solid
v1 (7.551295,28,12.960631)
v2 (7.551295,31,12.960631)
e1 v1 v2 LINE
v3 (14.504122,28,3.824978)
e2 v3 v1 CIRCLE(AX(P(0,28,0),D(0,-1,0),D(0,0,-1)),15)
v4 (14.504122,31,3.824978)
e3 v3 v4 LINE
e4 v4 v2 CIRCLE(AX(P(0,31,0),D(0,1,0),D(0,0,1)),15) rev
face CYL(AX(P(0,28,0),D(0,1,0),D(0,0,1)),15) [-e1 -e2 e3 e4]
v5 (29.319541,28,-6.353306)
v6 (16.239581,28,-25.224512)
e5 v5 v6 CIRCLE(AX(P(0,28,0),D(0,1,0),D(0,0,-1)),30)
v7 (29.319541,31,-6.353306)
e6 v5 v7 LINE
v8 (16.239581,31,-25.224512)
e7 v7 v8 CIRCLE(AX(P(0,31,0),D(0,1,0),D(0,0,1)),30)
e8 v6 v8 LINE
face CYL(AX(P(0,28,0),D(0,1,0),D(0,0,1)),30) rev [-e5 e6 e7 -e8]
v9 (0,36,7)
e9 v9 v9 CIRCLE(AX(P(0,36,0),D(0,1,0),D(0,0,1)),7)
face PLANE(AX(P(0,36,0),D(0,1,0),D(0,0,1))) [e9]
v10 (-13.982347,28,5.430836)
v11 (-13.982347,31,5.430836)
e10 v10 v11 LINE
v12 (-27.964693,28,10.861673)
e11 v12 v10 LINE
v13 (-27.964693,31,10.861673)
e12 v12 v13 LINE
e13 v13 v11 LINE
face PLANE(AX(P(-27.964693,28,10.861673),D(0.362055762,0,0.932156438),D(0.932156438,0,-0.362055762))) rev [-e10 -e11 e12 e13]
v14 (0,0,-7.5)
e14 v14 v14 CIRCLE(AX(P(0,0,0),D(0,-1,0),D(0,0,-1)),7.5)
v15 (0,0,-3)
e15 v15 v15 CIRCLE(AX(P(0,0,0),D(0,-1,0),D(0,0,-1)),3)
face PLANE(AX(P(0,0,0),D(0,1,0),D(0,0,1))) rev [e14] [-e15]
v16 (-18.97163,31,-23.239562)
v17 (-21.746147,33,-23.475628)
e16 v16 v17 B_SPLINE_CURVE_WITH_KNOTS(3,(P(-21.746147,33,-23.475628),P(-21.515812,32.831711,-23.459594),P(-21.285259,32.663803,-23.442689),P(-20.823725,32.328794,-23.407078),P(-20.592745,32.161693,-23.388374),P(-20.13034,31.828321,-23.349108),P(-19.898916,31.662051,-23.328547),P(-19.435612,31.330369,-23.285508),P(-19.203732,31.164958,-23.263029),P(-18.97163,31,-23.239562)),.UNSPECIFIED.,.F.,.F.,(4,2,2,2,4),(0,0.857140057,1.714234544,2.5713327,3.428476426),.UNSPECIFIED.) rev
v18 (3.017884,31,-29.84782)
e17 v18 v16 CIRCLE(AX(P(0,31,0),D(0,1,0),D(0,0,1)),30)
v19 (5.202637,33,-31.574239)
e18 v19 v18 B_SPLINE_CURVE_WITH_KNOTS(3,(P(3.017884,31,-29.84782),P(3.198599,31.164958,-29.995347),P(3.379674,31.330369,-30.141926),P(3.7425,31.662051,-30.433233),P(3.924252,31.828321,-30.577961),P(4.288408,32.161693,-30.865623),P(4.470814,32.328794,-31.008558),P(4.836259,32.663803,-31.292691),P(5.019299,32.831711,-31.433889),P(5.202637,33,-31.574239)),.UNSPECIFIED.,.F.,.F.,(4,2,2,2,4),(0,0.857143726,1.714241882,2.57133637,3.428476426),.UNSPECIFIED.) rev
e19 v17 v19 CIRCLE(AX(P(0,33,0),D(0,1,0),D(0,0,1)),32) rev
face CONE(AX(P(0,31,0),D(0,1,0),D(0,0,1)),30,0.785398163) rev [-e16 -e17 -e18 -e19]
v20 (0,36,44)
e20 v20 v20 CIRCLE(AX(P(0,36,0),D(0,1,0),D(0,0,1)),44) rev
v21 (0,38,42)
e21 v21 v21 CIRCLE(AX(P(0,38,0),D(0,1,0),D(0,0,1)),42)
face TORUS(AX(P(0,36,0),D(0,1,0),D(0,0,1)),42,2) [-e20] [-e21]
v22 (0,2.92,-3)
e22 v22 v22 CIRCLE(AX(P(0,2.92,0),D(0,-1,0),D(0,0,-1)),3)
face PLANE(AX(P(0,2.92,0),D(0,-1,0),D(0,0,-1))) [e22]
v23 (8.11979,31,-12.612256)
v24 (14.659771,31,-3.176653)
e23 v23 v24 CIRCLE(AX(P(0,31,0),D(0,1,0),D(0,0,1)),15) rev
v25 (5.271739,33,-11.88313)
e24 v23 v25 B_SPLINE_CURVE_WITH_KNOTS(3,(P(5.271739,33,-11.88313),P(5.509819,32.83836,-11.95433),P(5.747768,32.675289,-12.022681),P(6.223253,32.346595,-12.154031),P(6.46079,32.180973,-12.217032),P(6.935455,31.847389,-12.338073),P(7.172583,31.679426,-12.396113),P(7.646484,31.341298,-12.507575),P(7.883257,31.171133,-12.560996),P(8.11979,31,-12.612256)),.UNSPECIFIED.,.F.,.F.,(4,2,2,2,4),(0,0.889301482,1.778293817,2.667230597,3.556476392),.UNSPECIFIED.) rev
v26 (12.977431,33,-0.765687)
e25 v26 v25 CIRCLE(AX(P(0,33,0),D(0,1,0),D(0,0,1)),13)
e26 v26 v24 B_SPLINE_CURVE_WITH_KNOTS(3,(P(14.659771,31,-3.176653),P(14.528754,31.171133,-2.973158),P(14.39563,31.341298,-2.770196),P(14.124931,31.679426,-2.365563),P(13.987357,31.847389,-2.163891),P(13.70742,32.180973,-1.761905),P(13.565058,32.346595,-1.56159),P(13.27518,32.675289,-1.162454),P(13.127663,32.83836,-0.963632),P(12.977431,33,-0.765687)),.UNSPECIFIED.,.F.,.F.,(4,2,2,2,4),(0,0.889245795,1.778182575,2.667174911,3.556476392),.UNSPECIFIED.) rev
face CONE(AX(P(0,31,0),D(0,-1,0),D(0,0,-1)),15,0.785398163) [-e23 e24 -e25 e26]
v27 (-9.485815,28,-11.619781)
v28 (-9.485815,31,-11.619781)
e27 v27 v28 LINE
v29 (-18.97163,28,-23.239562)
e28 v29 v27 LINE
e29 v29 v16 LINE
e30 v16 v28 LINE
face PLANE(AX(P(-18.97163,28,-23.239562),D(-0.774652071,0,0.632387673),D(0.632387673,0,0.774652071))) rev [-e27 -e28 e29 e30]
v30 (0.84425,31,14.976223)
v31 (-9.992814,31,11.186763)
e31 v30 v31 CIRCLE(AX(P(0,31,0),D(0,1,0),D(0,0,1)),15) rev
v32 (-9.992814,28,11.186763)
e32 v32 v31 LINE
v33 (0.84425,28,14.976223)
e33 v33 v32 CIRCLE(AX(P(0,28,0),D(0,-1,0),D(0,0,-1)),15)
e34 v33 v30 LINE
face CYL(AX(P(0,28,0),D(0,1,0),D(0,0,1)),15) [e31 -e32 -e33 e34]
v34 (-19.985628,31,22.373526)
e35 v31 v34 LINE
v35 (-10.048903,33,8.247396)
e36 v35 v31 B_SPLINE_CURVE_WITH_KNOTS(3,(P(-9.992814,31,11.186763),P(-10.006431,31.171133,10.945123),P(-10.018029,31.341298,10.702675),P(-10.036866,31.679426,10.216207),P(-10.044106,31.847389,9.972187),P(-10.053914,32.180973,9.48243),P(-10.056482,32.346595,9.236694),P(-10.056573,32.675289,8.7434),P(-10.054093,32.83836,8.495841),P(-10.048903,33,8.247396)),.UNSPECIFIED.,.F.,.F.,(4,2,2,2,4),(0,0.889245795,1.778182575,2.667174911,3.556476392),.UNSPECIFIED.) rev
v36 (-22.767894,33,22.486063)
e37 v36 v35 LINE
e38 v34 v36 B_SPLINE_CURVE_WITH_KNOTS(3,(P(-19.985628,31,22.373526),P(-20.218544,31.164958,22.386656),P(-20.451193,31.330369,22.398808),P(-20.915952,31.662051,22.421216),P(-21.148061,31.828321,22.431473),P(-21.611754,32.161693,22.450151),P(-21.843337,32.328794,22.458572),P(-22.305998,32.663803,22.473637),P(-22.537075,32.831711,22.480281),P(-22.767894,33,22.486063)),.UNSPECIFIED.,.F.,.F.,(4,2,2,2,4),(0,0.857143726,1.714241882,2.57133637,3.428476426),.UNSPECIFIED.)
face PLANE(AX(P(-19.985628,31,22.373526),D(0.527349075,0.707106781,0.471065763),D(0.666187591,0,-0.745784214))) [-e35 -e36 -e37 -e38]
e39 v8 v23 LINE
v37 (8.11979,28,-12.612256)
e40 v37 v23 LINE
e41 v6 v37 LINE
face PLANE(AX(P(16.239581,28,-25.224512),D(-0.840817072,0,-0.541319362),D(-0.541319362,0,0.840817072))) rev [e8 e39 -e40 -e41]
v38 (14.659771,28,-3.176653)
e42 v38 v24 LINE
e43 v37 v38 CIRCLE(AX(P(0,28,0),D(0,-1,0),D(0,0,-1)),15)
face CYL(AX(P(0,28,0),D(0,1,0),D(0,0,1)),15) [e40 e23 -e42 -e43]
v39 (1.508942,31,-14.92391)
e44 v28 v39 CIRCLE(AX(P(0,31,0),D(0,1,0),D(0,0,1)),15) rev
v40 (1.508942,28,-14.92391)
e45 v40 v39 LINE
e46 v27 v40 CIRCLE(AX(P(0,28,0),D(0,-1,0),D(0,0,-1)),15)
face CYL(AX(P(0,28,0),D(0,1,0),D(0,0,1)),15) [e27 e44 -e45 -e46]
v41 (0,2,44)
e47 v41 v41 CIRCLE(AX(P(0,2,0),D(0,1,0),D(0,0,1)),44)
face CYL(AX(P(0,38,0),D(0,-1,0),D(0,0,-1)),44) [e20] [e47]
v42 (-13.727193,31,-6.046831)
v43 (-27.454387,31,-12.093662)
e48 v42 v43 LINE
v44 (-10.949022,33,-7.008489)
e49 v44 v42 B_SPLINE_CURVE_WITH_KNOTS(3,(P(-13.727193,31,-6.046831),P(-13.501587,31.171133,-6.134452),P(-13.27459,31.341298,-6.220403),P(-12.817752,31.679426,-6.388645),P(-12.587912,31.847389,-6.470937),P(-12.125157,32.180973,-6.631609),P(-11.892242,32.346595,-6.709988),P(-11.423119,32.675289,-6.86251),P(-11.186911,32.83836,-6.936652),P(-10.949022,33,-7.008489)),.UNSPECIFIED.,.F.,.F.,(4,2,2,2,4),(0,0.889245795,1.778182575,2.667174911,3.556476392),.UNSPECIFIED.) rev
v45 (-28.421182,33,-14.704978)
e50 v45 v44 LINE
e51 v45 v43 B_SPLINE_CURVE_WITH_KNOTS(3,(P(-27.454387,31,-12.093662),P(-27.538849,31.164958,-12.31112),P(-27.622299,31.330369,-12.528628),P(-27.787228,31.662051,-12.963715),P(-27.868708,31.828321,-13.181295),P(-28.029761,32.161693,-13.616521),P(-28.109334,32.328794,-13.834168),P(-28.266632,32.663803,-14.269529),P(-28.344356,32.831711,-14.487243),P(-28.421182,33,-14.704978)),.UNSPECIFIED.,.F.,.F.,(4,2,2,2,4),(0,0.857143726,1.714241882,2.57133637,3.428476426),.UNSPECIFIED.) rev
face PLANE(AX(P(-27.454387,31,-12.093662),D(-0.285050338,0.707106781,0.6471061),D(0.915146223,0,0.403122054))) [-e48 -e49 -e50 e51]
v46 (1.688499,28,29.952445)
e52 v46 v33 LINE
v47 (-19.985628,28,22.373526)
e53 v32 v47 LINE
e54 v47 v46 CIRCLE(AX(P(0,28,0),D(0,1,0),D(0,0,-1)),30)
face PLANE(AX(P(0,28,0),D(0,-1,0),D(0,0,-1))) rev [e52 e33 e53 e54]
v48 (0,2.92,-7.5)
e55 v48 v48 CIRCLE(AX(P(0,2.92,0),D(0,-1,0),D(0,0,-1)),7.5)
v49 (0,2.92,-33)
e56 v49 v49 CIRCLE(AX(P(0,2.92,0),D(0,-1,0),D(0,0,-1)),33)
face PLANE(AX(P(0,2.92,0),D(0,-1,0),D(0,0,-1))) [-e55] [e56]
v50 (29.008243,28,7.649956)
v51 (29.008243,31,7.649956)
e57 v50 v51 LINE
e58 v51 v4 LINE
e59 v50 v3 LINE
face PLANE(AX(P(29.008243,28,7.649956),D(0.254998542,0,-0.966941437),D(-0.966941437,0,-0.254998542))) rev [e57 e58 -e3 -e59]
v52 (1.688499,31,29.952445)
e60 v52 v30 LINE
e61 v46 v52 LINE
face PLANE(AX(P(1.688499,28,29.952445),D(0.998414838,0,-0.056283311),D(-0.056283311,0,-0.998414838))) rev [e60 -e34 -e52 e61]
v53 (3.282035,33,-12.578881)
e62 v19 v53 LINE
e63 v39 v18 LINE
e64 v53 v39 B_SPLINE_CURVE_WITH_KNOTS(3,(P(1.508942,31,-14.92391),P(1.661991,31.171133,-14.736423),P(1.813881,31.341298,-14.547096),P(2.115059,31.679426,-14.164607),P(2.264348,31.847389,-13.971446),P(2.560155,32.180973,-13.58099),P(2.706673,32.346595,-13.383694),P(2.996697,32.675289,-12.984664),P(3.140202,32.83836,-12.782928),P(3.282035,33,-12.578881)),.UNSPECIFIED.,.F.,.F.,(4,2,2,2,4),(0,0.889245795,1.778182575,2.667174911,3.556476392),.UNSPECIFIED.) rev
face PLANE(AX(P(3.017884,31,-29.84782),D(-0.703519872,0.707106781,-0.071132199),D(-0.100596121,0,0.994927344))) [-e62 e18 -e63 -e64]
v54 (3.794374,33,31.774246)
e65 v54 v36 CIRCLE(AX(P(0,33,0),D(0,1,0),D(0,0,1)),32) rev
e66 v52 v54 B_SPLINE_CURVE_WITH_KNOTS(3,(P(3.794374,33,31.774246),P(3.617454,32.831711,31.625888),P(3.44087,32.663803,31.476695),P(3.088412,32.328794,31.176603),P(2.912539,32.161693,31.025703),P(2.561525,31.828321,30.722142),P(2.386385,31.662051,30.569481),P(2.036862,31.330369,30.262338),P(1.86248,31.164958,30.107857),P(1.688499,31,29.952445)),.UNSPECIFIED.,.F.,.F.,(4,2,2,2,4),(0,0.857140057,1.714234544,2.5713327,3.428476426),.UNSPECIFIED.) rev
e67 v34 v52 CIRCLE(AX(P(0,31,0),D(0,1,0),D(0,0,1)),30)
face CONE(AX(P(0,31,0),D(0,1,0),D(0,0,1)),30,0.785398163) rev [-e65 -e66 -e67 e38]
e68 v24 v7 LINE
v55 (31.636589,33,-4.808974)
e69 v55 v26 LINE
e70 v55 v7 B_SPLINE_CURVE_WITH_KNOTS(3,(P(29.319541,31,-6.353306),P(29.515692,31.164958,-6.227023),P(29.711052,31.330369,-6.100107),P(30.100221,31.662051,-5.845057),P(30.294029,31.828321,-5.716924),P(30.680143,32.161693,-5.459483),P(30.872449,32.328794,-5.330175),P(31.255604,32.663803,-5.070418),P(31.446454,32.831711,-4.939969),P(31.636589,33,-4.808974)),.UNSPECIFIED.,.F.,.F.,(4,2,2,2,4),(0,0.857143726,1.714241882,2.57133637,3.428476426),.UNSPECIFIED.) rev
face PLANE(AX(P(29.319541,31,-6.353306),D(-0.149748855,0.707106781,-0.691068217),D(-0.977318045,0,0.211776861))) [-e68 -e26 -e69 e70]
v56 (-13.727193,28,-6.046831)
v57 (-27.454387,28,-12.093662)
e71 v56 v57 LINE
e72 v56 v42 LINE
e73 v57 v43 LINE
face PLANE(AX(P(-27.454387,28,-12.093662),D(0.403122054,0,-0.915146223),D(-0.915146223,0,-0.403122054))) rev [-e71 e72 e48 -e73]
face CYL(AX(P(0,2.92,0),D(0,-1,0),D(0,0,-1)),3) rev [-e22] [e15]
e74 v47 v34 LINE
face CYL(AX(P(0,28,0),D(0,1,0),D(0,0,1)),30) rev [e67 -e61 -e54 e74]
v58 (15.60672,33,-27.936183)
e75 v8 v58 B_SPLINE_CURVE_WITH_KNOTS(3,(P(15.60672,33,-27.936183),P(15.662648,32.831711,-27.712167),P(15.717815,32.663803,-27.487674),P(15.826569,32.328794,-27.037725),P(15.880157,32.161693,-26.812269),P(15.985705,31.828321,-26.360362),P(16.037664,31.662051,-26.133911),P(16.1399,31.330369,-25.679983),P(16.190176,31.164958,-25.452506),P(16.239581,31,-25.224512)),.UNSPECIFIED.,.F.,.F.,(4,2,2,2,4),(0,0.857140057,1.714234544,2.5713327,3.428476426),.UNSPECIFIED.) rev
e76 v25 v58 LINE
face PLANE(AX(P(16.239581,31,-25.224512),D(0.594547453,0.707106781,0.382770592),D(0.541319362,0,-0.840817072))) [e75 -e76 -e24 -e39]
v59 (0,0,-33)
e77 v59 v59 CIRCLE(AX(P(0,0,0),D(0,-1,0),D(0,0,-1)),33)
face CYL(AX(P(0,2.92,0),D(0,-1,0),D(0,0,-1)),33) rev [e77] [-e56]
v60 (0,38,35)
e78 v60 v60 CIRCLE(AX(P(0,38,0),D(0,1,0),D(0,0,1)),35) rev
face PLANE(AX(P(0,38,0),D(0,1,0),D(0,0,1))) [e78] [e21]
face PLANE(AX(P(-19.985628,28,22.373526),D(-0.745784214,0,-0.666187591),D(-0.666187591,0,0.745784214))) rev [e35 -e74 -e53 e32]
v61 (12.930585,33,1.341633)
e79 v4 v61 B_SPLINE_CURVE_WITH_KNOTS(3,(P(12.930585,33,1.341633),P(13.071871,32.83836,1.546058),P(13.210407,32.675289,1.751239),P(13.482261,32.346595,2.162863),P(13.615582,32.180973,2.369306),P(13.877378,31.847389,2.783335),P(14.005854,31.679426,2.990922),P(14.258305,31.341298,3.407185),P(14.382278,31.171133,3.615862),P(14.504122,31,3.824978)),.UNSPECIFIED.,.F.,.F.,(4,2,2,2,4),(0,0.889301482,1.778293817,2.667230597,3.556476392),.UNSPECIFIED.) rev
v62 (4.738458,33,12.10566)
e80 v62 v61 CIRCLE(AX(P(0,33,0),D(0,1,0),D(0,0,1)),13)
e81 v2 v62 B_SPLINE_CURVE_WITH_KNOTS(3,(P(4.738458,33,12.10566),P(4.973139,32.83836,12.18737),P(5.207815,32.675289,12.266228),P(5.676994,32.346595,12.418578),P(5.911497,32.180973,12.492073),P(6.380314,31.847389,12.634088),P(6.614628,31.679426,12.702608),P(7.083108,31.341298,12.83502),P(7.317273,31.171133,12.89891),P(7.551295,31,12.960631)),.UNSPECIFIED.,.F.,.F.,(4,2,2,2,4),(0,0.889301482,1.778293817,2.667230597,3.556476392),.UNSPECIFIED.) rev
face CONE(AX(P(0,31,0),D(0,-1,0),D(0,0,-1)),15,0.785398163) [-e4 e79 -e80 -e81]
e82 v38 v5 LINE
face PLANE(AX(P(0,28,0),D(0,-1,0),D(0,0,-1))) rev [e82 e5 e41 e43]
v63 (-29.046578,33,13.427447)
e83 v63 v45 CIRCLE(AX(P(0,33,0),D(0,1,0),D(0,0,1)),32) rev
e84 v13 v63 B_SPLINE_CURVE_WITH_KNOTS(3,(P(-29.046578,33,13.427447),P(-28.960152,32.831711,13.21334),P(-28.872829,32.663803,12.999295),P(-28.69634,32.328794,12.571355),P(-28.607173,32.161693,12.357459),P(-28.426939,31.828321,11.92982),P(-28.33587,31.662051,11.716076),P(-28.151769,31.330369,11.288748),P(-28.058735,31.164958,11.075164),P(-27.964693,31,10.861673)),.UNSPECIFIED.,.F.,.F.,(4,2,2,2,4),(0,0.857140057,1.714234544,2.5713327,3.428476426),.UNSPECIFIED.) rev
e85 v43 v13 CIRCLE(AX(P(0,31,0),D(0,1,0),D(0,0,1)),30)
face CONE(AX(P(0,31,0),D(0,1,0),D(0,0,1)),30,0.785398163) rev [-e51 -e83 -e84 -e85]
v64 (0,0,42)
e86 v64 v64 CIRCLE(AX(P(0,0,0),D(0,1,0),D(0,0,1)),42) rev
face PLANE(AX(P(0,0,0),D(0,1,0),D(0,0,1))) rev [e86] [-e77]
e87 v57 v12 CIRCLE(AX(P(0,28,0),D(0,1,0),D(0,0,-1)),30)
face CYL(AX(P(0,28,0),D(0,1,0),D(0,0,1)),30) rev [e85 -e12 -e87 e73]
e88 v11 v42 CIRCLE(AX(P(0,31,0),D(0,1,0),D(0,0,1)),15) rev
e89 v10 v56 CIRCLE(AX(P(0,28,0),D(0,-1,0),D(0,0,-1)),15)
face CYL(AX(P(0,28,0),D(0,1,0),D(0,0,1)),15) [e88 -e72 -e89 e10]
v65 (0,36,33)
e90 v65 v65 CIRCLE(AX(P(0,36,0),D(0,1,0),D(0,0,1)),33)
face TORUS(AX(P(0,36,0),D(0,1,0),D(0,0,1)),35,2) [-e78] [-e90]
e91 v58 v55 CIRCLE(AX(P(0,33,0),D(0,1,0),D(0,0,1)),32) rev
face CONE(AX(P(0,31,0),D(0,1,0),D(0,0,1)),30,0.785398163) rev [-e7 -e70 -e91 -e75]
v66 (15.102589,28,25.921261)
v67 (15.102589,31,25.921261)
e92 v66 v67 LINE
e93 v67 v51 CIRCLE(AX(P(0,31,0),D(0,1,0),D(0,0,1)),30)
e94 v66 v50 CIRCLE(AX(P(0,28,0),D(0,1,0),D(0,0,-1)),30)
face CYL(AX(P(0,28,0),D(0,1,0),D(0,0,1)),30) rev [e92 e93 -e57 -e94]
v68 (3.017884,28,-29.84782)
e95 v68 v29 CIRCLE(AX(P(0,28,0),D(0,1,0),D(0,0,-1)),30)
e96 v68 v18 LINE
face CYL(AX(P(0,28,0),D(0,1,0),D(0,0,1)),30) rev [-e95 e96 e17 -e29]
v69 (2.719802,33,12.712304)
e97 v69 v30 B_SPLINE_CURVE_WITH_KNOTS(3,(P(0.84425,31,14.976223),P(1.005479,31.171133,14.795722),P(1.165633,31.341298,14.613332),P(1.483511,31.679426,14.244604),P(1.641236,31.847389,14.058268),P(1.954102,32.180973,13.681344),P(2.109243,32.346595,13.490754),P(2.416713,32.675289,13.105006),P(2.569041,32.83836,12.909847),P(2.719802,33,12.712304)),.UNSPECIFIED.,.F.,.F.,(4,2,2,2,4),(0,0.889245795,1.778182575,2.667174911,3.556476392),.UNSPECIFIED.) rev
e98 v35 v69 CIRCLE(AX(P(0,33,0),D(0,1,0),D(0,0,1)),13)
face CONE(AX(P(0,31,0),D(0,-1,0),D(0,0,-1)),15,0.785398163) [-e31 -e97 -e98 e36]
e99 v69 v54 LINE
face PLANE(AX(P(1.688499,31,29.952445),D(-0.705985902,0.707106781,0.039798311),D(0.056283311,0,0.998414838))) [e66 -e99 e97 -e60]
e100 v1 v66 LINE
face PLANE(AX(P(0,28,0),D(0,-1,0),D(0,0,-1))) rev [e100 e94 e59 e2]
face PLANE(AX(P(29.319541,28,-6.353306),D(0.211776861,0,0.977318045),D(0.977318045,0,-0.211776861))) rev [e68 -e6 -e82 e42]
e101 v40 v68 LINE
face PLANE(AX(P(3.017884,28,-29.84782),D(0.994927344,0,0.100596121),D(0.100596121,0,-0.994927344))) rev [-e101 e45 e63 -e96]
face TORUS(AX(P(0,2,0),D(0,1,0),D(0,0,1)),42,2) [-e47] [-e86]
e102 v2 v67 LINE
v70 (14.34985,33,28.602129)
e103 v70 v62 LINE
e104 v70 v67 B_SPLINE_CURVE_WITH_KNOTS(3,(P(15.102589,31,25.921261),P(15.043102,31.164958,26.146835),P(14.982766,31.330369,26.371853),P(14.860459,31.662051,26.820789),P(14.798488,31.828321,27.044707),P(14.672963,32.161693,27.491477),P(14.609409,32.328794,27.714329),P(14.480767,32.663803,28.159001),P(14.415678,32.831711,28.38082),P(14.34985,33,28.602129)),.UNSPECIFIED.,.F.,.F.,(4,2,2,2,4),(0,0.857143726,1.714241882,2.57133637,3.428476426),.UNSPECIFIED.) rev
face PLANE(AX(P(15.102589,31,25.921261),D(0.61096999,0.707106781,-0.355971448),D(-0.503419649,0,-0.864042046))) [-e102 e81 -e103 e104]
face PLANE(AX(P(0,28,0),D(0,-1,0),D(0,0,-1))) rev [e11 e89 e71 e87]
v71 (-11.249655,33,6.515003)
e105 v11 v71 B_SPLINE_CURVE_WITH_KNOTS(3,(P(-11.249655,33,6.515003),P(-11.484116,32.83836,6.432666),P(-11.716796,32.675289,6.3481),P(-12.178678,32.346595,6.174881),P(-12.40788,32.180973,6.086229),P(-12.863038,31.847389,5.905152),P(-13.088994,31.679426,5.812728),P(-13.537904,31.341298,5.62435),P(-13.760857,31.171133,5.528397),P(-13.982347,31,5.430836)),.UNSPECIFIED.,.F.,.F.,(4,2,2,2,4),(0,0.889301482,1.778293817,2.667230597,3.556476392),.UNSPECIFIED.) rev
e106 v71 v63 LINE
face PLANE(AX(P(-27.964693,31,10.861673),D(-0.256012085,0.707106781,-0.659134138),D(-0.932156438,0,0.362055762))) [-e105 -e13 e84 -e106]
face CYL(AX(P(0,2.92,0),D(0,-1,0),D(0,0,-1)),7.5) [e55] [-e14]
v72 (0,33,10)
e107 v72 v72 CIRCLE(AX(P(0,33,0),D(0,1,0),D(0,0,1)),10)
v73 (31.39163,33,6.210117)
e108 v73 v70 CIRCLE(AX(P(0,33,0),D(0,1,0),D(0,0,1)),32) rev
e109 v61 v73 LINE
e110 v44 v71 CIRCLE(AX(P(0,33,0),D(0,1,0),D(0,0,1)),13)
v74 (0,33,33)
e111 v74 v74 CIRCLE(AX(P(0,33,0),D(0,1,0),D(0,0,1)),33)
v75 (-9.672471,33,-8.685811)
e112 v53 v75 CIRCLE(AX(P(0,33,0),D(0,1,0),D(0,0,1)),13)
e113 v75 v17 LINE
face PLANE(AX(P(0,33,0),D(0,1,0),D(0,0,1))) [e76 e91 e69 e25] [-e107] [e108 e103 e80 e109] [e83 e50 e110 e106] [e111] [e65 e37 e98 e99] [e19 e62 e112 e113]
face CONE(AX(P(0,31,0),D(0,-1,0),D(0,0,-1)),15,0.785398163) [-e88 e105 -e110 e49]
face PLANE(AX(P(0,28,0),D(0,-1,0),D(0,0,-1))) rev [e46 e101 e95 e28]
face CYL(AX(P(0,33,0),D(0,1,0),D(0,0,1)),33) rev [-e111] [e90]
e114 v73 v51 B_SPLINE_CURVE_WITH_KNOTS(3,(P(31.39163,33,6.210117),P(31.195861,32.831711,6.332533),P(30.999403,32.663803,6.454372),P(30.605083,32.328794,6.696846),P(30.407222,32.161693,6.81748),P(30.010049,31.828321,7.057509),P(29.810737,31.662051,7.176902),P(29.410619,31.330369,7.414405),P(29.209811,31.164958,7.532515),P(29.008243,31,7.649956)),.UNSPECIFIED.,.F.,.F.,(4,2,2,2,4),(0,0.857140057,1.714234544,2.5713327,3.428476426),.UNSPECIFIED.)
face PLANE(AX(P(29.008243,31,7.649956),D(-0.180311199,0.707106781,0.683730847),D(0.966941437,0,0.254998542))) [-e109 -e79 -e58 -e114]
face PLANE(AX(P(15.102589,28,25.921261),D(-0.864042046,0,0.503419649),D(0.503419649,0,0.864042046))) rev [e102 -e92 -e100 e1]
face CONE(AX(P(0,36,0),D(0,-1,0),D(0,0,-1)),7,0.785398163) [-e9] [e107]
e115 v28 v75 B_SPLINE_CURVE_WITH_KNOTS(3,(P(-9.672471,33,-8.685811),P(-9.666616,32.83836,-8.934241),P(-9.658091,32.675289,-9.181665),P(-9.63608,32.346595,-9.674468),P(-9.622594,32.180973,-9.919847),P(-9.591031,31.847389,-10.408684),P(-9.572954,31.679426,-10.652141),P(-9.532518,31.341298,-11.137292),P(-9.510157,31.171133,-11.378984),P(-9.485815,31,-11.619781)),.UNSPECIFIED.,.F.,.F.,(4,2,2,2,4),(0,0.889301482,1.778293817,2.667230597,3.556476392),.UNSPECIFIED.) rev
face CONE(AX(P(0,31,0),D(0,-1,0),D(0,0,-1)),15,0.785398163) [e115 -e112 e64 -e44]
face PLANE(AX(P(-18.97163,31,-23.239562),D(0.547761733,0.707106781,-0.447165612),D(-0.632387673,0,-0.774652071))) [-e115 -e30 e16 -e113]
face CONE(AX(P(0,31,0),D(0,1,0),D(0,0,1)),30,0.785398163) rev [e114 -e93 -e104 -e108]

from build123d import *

# Parameters (mm, degrees)
SKETCH_1_R          = 44
EXTRUDE_1_DEPTH     = 38
SKETCH_3_R          = 33
CUT_EXTRUDE_1_DEPTH = 5
CUT_EXTRUDE_2_DEPTH = 5
SKETCH_5_R          = 10
EXTRUDE_2_DEPTH     = 3
CHAMFER_1_SIZE      = 3
CHAMFER_2_SIZE      = 2
FILLET_1_R          = 2
CUT_EXTRUDE_START   = -2.92
SKETCH_6_R          = 33
SKETCH_6_R_2        = 7.5
SKETCH_6_R_3        = 3
CUT_EXTRUDE_3_DEPTH = 2.92


with BuildPart() as part:
    # 草图1 → 凸台-拉伸1 (new body)
    with BuildSketch(Plane(origin=(0, 0, 0), x_dir=(1, 0, 0), z_dir=(0, 1, 0))):
        with Locations(Location((0, 0, 0), (0, 0, 270))):
            Circle(SKETCH_1_R)
    extrude(amount=EXTRUDE_1_DEPTH)

    # 草图3 → 切除-拉伸1 (cut)
    with BuildSketch(Plane(origin=(0, 38, 0), x_dir=(1, 0, 0), z_dir=(0, 1, 0))):
        with Locations(Location((0, 0, 0), (0, 0, 270))):
            Circle(SKETCH_3_R)
    extrude(amount=-CUT_EXTRUDE_1_DEPTH, mode=Mode.SUBTRACT)

    # 草图4 → 切除-拉伸2 (cut)
    with BuildSketch(Plane(origin=(0, 33, 0), x_dir=(1, 0, 0), z_dir=(0, 1, 0))):
        with BuildLine():
            Line((-18.971630185, 23.239562132), (-9.485815093, 11.619781066))
            ThreePointArc((-9.485815093, 11.619781066), (-4.317052712, 14.365342178), (1.508941811, 14.923910165))
            Line((1.508941811, 14.923910165), (3.017883621, 29.84782033))
            ThreePointArc((3.017883621, 29.84782033), (-8.634105423, 28.730684356), (-18.971630185, 23.239562132))
        make_face()
        with BuildLine():
            Line((29.319541348, 6.353305844), (14.659770674, 3.176652922))
            ThreePointArc((14.659770674, 3.176652922), (12.328209633, 8.544895976), (8.119790432, 12.612256077))
            Line((8.119790432, 12.612256077), (16.239580864, 25.224512153))
            ThreePointArc((16.239580864, 25.224512153), (24.656419267, 17.089791951), (29.319541348, 6.353305844))
        make_face()
        with BuildLine():
            Line((15.102589466, -25.921261378), (7.551294733, -12.960630689))
            ThreePointArc((7.551294733, -12.960630689), (11.936305286, -9.084306035), (14.504121561, -3.824978136))
            Line((14.504121561, -3.824978136), (29.008243122, -7.649956272))
            ThreePointArc((29.008243122, -7.649956272), (23.872610571, -18.168612069), (15.102589466, -25.921261378))
        make_face()
        with BuildLine():
            Line((-19.98562774, -22.373526406), (-9.99281387, -11.186763203))
            ThreePointArc((-9.99281387, -11.186763203), (-4.951167267, -14.159305869), (0.84424967, -14.976222571))
            Line((0.84424967, -14.976222571), (1.68849934, -29.952445142))
            ThreePointArc((1.68849934, -29.952445142), (-9.902334534, -28.318611738), (-19.98562774, -22.373526406))
        make_face()
        with BuildLine():
            Line((-27.454386696, 12.09366161), (-13.727193348, 6.046830805))
            ThreePointArc((-13.727193348, 6.046830805), (-14.996294941, 0.33337375), (-13.98234657, -5.430836436))
            Line((-13.98234657, -5.430836436), (-27.96469314, -10.861672872))
            ThreePointArc((-27.96469314, -10.861672872), (-29.992589881, 0.666747501), (-27.454386696, 12.09366161))
        make_face()
    extrude(amount=-CUT_EXTRUDE_2_DEPTH, mode=Mode.SUBTRACT)

    # 草图5 → 凸台-拉伸2 (add)
    with BuildSketch(Plane(origin=(0, 33, 0), x_dir=(1, 0, 0), z_dir=(0, 1, 0))):
        with Locations(Location((0, 0, 0), (0, 0, 270))):
            Circle(SKETCH_5_R)
    extrude(amount=EXTRUDE_2_DEPTH)

    # 倒角1
    chamfer_1_edges = [part.edges().sort_by_distance(p)[0] for p in [
        (0, 36, -10),
    ]]
    chamfer(chamfer_1_edges, length=CHAMFER_1_SIZE - 0.0001)  # a hair under: the kernel refuses the full size

    # 倒角2
    chamfer_2_edges = [part.edges().sort_by_distance(p)[0] for p in [
        (-14.996294941, 33, -0.33337375),
        (-20.590790022, 33, -9.070246208),
        (-29.992589881, 33, -0.666747501),
        (-20.973519855, 33, 8.146254654),
        (-4.951167267, 33, 14.159305869),
        (-14.989220805, 33, 16.780144805),
        (-9.902334534, 33, 28.318611738),
        (1.266374505, 33, 22.464333856),
        (11.936305286, 33, 9.084306035),
        (11.3269421, 33, 19.440946033),
        (23.872610571, 33, 18.168612069),
        (21.756182342, 33, 5.737467204),
        (12.328209633, 33, -8.544895976),
        (21.989656011, 33, -4.764979383),
        (24.656419267, 33, -17.089791951),
        (12.179685648, 33, -18.918384115),
        (-4.317052712, 33, -14.365342178),
        (2.263412716, 33, -22.385865247),
        (-8.634105423, 33, -28.730684356),
        (-14.228722639, 33, -17.429671599),
    ]]
    chamfer(chamfer_2_edges, length=CHAMFER_2_SIZE)

    # 圆角1
    fillet_1_edges = [part.edges().sort_by_distance(p)[0] for p in [
        (0, 0, -44),
        (0, 38, -44),
        (0, 38, -33),
    ]]
    fillet(fillet_1_edges, radius=FILLET_1_R)

    # 草图6 → 切除-拉伸3 (cut)
    # profile 1 of 2: a face of its own
    with BuildSketch(Plane.XZ.offset(CUT_EXTRUDE_START)):
        with Locations(Location((0, 0, 0), (0, 0, 90))):
            Circle(SKETCH_6_R)
        with Locations(Location((0, 0, 0), (0, 0, 270))):
            Circle(SKETCH_6_R_2, mode=Mode.SUBTRACT)
    # profile 2 of 2: a face of its own
    with BuildSketch(Plane.XZ.offset(CUT_EXTRUDE_START)):
        with Locations(Location((0, 0, 0), (0, 0, 270))):
            Circle(SKETCH_6_R_3)
    extrude(amount=CUT_EXTRUDE_3_DEPTH, mode=Mode.SUBTRACT)


solid = part.part
